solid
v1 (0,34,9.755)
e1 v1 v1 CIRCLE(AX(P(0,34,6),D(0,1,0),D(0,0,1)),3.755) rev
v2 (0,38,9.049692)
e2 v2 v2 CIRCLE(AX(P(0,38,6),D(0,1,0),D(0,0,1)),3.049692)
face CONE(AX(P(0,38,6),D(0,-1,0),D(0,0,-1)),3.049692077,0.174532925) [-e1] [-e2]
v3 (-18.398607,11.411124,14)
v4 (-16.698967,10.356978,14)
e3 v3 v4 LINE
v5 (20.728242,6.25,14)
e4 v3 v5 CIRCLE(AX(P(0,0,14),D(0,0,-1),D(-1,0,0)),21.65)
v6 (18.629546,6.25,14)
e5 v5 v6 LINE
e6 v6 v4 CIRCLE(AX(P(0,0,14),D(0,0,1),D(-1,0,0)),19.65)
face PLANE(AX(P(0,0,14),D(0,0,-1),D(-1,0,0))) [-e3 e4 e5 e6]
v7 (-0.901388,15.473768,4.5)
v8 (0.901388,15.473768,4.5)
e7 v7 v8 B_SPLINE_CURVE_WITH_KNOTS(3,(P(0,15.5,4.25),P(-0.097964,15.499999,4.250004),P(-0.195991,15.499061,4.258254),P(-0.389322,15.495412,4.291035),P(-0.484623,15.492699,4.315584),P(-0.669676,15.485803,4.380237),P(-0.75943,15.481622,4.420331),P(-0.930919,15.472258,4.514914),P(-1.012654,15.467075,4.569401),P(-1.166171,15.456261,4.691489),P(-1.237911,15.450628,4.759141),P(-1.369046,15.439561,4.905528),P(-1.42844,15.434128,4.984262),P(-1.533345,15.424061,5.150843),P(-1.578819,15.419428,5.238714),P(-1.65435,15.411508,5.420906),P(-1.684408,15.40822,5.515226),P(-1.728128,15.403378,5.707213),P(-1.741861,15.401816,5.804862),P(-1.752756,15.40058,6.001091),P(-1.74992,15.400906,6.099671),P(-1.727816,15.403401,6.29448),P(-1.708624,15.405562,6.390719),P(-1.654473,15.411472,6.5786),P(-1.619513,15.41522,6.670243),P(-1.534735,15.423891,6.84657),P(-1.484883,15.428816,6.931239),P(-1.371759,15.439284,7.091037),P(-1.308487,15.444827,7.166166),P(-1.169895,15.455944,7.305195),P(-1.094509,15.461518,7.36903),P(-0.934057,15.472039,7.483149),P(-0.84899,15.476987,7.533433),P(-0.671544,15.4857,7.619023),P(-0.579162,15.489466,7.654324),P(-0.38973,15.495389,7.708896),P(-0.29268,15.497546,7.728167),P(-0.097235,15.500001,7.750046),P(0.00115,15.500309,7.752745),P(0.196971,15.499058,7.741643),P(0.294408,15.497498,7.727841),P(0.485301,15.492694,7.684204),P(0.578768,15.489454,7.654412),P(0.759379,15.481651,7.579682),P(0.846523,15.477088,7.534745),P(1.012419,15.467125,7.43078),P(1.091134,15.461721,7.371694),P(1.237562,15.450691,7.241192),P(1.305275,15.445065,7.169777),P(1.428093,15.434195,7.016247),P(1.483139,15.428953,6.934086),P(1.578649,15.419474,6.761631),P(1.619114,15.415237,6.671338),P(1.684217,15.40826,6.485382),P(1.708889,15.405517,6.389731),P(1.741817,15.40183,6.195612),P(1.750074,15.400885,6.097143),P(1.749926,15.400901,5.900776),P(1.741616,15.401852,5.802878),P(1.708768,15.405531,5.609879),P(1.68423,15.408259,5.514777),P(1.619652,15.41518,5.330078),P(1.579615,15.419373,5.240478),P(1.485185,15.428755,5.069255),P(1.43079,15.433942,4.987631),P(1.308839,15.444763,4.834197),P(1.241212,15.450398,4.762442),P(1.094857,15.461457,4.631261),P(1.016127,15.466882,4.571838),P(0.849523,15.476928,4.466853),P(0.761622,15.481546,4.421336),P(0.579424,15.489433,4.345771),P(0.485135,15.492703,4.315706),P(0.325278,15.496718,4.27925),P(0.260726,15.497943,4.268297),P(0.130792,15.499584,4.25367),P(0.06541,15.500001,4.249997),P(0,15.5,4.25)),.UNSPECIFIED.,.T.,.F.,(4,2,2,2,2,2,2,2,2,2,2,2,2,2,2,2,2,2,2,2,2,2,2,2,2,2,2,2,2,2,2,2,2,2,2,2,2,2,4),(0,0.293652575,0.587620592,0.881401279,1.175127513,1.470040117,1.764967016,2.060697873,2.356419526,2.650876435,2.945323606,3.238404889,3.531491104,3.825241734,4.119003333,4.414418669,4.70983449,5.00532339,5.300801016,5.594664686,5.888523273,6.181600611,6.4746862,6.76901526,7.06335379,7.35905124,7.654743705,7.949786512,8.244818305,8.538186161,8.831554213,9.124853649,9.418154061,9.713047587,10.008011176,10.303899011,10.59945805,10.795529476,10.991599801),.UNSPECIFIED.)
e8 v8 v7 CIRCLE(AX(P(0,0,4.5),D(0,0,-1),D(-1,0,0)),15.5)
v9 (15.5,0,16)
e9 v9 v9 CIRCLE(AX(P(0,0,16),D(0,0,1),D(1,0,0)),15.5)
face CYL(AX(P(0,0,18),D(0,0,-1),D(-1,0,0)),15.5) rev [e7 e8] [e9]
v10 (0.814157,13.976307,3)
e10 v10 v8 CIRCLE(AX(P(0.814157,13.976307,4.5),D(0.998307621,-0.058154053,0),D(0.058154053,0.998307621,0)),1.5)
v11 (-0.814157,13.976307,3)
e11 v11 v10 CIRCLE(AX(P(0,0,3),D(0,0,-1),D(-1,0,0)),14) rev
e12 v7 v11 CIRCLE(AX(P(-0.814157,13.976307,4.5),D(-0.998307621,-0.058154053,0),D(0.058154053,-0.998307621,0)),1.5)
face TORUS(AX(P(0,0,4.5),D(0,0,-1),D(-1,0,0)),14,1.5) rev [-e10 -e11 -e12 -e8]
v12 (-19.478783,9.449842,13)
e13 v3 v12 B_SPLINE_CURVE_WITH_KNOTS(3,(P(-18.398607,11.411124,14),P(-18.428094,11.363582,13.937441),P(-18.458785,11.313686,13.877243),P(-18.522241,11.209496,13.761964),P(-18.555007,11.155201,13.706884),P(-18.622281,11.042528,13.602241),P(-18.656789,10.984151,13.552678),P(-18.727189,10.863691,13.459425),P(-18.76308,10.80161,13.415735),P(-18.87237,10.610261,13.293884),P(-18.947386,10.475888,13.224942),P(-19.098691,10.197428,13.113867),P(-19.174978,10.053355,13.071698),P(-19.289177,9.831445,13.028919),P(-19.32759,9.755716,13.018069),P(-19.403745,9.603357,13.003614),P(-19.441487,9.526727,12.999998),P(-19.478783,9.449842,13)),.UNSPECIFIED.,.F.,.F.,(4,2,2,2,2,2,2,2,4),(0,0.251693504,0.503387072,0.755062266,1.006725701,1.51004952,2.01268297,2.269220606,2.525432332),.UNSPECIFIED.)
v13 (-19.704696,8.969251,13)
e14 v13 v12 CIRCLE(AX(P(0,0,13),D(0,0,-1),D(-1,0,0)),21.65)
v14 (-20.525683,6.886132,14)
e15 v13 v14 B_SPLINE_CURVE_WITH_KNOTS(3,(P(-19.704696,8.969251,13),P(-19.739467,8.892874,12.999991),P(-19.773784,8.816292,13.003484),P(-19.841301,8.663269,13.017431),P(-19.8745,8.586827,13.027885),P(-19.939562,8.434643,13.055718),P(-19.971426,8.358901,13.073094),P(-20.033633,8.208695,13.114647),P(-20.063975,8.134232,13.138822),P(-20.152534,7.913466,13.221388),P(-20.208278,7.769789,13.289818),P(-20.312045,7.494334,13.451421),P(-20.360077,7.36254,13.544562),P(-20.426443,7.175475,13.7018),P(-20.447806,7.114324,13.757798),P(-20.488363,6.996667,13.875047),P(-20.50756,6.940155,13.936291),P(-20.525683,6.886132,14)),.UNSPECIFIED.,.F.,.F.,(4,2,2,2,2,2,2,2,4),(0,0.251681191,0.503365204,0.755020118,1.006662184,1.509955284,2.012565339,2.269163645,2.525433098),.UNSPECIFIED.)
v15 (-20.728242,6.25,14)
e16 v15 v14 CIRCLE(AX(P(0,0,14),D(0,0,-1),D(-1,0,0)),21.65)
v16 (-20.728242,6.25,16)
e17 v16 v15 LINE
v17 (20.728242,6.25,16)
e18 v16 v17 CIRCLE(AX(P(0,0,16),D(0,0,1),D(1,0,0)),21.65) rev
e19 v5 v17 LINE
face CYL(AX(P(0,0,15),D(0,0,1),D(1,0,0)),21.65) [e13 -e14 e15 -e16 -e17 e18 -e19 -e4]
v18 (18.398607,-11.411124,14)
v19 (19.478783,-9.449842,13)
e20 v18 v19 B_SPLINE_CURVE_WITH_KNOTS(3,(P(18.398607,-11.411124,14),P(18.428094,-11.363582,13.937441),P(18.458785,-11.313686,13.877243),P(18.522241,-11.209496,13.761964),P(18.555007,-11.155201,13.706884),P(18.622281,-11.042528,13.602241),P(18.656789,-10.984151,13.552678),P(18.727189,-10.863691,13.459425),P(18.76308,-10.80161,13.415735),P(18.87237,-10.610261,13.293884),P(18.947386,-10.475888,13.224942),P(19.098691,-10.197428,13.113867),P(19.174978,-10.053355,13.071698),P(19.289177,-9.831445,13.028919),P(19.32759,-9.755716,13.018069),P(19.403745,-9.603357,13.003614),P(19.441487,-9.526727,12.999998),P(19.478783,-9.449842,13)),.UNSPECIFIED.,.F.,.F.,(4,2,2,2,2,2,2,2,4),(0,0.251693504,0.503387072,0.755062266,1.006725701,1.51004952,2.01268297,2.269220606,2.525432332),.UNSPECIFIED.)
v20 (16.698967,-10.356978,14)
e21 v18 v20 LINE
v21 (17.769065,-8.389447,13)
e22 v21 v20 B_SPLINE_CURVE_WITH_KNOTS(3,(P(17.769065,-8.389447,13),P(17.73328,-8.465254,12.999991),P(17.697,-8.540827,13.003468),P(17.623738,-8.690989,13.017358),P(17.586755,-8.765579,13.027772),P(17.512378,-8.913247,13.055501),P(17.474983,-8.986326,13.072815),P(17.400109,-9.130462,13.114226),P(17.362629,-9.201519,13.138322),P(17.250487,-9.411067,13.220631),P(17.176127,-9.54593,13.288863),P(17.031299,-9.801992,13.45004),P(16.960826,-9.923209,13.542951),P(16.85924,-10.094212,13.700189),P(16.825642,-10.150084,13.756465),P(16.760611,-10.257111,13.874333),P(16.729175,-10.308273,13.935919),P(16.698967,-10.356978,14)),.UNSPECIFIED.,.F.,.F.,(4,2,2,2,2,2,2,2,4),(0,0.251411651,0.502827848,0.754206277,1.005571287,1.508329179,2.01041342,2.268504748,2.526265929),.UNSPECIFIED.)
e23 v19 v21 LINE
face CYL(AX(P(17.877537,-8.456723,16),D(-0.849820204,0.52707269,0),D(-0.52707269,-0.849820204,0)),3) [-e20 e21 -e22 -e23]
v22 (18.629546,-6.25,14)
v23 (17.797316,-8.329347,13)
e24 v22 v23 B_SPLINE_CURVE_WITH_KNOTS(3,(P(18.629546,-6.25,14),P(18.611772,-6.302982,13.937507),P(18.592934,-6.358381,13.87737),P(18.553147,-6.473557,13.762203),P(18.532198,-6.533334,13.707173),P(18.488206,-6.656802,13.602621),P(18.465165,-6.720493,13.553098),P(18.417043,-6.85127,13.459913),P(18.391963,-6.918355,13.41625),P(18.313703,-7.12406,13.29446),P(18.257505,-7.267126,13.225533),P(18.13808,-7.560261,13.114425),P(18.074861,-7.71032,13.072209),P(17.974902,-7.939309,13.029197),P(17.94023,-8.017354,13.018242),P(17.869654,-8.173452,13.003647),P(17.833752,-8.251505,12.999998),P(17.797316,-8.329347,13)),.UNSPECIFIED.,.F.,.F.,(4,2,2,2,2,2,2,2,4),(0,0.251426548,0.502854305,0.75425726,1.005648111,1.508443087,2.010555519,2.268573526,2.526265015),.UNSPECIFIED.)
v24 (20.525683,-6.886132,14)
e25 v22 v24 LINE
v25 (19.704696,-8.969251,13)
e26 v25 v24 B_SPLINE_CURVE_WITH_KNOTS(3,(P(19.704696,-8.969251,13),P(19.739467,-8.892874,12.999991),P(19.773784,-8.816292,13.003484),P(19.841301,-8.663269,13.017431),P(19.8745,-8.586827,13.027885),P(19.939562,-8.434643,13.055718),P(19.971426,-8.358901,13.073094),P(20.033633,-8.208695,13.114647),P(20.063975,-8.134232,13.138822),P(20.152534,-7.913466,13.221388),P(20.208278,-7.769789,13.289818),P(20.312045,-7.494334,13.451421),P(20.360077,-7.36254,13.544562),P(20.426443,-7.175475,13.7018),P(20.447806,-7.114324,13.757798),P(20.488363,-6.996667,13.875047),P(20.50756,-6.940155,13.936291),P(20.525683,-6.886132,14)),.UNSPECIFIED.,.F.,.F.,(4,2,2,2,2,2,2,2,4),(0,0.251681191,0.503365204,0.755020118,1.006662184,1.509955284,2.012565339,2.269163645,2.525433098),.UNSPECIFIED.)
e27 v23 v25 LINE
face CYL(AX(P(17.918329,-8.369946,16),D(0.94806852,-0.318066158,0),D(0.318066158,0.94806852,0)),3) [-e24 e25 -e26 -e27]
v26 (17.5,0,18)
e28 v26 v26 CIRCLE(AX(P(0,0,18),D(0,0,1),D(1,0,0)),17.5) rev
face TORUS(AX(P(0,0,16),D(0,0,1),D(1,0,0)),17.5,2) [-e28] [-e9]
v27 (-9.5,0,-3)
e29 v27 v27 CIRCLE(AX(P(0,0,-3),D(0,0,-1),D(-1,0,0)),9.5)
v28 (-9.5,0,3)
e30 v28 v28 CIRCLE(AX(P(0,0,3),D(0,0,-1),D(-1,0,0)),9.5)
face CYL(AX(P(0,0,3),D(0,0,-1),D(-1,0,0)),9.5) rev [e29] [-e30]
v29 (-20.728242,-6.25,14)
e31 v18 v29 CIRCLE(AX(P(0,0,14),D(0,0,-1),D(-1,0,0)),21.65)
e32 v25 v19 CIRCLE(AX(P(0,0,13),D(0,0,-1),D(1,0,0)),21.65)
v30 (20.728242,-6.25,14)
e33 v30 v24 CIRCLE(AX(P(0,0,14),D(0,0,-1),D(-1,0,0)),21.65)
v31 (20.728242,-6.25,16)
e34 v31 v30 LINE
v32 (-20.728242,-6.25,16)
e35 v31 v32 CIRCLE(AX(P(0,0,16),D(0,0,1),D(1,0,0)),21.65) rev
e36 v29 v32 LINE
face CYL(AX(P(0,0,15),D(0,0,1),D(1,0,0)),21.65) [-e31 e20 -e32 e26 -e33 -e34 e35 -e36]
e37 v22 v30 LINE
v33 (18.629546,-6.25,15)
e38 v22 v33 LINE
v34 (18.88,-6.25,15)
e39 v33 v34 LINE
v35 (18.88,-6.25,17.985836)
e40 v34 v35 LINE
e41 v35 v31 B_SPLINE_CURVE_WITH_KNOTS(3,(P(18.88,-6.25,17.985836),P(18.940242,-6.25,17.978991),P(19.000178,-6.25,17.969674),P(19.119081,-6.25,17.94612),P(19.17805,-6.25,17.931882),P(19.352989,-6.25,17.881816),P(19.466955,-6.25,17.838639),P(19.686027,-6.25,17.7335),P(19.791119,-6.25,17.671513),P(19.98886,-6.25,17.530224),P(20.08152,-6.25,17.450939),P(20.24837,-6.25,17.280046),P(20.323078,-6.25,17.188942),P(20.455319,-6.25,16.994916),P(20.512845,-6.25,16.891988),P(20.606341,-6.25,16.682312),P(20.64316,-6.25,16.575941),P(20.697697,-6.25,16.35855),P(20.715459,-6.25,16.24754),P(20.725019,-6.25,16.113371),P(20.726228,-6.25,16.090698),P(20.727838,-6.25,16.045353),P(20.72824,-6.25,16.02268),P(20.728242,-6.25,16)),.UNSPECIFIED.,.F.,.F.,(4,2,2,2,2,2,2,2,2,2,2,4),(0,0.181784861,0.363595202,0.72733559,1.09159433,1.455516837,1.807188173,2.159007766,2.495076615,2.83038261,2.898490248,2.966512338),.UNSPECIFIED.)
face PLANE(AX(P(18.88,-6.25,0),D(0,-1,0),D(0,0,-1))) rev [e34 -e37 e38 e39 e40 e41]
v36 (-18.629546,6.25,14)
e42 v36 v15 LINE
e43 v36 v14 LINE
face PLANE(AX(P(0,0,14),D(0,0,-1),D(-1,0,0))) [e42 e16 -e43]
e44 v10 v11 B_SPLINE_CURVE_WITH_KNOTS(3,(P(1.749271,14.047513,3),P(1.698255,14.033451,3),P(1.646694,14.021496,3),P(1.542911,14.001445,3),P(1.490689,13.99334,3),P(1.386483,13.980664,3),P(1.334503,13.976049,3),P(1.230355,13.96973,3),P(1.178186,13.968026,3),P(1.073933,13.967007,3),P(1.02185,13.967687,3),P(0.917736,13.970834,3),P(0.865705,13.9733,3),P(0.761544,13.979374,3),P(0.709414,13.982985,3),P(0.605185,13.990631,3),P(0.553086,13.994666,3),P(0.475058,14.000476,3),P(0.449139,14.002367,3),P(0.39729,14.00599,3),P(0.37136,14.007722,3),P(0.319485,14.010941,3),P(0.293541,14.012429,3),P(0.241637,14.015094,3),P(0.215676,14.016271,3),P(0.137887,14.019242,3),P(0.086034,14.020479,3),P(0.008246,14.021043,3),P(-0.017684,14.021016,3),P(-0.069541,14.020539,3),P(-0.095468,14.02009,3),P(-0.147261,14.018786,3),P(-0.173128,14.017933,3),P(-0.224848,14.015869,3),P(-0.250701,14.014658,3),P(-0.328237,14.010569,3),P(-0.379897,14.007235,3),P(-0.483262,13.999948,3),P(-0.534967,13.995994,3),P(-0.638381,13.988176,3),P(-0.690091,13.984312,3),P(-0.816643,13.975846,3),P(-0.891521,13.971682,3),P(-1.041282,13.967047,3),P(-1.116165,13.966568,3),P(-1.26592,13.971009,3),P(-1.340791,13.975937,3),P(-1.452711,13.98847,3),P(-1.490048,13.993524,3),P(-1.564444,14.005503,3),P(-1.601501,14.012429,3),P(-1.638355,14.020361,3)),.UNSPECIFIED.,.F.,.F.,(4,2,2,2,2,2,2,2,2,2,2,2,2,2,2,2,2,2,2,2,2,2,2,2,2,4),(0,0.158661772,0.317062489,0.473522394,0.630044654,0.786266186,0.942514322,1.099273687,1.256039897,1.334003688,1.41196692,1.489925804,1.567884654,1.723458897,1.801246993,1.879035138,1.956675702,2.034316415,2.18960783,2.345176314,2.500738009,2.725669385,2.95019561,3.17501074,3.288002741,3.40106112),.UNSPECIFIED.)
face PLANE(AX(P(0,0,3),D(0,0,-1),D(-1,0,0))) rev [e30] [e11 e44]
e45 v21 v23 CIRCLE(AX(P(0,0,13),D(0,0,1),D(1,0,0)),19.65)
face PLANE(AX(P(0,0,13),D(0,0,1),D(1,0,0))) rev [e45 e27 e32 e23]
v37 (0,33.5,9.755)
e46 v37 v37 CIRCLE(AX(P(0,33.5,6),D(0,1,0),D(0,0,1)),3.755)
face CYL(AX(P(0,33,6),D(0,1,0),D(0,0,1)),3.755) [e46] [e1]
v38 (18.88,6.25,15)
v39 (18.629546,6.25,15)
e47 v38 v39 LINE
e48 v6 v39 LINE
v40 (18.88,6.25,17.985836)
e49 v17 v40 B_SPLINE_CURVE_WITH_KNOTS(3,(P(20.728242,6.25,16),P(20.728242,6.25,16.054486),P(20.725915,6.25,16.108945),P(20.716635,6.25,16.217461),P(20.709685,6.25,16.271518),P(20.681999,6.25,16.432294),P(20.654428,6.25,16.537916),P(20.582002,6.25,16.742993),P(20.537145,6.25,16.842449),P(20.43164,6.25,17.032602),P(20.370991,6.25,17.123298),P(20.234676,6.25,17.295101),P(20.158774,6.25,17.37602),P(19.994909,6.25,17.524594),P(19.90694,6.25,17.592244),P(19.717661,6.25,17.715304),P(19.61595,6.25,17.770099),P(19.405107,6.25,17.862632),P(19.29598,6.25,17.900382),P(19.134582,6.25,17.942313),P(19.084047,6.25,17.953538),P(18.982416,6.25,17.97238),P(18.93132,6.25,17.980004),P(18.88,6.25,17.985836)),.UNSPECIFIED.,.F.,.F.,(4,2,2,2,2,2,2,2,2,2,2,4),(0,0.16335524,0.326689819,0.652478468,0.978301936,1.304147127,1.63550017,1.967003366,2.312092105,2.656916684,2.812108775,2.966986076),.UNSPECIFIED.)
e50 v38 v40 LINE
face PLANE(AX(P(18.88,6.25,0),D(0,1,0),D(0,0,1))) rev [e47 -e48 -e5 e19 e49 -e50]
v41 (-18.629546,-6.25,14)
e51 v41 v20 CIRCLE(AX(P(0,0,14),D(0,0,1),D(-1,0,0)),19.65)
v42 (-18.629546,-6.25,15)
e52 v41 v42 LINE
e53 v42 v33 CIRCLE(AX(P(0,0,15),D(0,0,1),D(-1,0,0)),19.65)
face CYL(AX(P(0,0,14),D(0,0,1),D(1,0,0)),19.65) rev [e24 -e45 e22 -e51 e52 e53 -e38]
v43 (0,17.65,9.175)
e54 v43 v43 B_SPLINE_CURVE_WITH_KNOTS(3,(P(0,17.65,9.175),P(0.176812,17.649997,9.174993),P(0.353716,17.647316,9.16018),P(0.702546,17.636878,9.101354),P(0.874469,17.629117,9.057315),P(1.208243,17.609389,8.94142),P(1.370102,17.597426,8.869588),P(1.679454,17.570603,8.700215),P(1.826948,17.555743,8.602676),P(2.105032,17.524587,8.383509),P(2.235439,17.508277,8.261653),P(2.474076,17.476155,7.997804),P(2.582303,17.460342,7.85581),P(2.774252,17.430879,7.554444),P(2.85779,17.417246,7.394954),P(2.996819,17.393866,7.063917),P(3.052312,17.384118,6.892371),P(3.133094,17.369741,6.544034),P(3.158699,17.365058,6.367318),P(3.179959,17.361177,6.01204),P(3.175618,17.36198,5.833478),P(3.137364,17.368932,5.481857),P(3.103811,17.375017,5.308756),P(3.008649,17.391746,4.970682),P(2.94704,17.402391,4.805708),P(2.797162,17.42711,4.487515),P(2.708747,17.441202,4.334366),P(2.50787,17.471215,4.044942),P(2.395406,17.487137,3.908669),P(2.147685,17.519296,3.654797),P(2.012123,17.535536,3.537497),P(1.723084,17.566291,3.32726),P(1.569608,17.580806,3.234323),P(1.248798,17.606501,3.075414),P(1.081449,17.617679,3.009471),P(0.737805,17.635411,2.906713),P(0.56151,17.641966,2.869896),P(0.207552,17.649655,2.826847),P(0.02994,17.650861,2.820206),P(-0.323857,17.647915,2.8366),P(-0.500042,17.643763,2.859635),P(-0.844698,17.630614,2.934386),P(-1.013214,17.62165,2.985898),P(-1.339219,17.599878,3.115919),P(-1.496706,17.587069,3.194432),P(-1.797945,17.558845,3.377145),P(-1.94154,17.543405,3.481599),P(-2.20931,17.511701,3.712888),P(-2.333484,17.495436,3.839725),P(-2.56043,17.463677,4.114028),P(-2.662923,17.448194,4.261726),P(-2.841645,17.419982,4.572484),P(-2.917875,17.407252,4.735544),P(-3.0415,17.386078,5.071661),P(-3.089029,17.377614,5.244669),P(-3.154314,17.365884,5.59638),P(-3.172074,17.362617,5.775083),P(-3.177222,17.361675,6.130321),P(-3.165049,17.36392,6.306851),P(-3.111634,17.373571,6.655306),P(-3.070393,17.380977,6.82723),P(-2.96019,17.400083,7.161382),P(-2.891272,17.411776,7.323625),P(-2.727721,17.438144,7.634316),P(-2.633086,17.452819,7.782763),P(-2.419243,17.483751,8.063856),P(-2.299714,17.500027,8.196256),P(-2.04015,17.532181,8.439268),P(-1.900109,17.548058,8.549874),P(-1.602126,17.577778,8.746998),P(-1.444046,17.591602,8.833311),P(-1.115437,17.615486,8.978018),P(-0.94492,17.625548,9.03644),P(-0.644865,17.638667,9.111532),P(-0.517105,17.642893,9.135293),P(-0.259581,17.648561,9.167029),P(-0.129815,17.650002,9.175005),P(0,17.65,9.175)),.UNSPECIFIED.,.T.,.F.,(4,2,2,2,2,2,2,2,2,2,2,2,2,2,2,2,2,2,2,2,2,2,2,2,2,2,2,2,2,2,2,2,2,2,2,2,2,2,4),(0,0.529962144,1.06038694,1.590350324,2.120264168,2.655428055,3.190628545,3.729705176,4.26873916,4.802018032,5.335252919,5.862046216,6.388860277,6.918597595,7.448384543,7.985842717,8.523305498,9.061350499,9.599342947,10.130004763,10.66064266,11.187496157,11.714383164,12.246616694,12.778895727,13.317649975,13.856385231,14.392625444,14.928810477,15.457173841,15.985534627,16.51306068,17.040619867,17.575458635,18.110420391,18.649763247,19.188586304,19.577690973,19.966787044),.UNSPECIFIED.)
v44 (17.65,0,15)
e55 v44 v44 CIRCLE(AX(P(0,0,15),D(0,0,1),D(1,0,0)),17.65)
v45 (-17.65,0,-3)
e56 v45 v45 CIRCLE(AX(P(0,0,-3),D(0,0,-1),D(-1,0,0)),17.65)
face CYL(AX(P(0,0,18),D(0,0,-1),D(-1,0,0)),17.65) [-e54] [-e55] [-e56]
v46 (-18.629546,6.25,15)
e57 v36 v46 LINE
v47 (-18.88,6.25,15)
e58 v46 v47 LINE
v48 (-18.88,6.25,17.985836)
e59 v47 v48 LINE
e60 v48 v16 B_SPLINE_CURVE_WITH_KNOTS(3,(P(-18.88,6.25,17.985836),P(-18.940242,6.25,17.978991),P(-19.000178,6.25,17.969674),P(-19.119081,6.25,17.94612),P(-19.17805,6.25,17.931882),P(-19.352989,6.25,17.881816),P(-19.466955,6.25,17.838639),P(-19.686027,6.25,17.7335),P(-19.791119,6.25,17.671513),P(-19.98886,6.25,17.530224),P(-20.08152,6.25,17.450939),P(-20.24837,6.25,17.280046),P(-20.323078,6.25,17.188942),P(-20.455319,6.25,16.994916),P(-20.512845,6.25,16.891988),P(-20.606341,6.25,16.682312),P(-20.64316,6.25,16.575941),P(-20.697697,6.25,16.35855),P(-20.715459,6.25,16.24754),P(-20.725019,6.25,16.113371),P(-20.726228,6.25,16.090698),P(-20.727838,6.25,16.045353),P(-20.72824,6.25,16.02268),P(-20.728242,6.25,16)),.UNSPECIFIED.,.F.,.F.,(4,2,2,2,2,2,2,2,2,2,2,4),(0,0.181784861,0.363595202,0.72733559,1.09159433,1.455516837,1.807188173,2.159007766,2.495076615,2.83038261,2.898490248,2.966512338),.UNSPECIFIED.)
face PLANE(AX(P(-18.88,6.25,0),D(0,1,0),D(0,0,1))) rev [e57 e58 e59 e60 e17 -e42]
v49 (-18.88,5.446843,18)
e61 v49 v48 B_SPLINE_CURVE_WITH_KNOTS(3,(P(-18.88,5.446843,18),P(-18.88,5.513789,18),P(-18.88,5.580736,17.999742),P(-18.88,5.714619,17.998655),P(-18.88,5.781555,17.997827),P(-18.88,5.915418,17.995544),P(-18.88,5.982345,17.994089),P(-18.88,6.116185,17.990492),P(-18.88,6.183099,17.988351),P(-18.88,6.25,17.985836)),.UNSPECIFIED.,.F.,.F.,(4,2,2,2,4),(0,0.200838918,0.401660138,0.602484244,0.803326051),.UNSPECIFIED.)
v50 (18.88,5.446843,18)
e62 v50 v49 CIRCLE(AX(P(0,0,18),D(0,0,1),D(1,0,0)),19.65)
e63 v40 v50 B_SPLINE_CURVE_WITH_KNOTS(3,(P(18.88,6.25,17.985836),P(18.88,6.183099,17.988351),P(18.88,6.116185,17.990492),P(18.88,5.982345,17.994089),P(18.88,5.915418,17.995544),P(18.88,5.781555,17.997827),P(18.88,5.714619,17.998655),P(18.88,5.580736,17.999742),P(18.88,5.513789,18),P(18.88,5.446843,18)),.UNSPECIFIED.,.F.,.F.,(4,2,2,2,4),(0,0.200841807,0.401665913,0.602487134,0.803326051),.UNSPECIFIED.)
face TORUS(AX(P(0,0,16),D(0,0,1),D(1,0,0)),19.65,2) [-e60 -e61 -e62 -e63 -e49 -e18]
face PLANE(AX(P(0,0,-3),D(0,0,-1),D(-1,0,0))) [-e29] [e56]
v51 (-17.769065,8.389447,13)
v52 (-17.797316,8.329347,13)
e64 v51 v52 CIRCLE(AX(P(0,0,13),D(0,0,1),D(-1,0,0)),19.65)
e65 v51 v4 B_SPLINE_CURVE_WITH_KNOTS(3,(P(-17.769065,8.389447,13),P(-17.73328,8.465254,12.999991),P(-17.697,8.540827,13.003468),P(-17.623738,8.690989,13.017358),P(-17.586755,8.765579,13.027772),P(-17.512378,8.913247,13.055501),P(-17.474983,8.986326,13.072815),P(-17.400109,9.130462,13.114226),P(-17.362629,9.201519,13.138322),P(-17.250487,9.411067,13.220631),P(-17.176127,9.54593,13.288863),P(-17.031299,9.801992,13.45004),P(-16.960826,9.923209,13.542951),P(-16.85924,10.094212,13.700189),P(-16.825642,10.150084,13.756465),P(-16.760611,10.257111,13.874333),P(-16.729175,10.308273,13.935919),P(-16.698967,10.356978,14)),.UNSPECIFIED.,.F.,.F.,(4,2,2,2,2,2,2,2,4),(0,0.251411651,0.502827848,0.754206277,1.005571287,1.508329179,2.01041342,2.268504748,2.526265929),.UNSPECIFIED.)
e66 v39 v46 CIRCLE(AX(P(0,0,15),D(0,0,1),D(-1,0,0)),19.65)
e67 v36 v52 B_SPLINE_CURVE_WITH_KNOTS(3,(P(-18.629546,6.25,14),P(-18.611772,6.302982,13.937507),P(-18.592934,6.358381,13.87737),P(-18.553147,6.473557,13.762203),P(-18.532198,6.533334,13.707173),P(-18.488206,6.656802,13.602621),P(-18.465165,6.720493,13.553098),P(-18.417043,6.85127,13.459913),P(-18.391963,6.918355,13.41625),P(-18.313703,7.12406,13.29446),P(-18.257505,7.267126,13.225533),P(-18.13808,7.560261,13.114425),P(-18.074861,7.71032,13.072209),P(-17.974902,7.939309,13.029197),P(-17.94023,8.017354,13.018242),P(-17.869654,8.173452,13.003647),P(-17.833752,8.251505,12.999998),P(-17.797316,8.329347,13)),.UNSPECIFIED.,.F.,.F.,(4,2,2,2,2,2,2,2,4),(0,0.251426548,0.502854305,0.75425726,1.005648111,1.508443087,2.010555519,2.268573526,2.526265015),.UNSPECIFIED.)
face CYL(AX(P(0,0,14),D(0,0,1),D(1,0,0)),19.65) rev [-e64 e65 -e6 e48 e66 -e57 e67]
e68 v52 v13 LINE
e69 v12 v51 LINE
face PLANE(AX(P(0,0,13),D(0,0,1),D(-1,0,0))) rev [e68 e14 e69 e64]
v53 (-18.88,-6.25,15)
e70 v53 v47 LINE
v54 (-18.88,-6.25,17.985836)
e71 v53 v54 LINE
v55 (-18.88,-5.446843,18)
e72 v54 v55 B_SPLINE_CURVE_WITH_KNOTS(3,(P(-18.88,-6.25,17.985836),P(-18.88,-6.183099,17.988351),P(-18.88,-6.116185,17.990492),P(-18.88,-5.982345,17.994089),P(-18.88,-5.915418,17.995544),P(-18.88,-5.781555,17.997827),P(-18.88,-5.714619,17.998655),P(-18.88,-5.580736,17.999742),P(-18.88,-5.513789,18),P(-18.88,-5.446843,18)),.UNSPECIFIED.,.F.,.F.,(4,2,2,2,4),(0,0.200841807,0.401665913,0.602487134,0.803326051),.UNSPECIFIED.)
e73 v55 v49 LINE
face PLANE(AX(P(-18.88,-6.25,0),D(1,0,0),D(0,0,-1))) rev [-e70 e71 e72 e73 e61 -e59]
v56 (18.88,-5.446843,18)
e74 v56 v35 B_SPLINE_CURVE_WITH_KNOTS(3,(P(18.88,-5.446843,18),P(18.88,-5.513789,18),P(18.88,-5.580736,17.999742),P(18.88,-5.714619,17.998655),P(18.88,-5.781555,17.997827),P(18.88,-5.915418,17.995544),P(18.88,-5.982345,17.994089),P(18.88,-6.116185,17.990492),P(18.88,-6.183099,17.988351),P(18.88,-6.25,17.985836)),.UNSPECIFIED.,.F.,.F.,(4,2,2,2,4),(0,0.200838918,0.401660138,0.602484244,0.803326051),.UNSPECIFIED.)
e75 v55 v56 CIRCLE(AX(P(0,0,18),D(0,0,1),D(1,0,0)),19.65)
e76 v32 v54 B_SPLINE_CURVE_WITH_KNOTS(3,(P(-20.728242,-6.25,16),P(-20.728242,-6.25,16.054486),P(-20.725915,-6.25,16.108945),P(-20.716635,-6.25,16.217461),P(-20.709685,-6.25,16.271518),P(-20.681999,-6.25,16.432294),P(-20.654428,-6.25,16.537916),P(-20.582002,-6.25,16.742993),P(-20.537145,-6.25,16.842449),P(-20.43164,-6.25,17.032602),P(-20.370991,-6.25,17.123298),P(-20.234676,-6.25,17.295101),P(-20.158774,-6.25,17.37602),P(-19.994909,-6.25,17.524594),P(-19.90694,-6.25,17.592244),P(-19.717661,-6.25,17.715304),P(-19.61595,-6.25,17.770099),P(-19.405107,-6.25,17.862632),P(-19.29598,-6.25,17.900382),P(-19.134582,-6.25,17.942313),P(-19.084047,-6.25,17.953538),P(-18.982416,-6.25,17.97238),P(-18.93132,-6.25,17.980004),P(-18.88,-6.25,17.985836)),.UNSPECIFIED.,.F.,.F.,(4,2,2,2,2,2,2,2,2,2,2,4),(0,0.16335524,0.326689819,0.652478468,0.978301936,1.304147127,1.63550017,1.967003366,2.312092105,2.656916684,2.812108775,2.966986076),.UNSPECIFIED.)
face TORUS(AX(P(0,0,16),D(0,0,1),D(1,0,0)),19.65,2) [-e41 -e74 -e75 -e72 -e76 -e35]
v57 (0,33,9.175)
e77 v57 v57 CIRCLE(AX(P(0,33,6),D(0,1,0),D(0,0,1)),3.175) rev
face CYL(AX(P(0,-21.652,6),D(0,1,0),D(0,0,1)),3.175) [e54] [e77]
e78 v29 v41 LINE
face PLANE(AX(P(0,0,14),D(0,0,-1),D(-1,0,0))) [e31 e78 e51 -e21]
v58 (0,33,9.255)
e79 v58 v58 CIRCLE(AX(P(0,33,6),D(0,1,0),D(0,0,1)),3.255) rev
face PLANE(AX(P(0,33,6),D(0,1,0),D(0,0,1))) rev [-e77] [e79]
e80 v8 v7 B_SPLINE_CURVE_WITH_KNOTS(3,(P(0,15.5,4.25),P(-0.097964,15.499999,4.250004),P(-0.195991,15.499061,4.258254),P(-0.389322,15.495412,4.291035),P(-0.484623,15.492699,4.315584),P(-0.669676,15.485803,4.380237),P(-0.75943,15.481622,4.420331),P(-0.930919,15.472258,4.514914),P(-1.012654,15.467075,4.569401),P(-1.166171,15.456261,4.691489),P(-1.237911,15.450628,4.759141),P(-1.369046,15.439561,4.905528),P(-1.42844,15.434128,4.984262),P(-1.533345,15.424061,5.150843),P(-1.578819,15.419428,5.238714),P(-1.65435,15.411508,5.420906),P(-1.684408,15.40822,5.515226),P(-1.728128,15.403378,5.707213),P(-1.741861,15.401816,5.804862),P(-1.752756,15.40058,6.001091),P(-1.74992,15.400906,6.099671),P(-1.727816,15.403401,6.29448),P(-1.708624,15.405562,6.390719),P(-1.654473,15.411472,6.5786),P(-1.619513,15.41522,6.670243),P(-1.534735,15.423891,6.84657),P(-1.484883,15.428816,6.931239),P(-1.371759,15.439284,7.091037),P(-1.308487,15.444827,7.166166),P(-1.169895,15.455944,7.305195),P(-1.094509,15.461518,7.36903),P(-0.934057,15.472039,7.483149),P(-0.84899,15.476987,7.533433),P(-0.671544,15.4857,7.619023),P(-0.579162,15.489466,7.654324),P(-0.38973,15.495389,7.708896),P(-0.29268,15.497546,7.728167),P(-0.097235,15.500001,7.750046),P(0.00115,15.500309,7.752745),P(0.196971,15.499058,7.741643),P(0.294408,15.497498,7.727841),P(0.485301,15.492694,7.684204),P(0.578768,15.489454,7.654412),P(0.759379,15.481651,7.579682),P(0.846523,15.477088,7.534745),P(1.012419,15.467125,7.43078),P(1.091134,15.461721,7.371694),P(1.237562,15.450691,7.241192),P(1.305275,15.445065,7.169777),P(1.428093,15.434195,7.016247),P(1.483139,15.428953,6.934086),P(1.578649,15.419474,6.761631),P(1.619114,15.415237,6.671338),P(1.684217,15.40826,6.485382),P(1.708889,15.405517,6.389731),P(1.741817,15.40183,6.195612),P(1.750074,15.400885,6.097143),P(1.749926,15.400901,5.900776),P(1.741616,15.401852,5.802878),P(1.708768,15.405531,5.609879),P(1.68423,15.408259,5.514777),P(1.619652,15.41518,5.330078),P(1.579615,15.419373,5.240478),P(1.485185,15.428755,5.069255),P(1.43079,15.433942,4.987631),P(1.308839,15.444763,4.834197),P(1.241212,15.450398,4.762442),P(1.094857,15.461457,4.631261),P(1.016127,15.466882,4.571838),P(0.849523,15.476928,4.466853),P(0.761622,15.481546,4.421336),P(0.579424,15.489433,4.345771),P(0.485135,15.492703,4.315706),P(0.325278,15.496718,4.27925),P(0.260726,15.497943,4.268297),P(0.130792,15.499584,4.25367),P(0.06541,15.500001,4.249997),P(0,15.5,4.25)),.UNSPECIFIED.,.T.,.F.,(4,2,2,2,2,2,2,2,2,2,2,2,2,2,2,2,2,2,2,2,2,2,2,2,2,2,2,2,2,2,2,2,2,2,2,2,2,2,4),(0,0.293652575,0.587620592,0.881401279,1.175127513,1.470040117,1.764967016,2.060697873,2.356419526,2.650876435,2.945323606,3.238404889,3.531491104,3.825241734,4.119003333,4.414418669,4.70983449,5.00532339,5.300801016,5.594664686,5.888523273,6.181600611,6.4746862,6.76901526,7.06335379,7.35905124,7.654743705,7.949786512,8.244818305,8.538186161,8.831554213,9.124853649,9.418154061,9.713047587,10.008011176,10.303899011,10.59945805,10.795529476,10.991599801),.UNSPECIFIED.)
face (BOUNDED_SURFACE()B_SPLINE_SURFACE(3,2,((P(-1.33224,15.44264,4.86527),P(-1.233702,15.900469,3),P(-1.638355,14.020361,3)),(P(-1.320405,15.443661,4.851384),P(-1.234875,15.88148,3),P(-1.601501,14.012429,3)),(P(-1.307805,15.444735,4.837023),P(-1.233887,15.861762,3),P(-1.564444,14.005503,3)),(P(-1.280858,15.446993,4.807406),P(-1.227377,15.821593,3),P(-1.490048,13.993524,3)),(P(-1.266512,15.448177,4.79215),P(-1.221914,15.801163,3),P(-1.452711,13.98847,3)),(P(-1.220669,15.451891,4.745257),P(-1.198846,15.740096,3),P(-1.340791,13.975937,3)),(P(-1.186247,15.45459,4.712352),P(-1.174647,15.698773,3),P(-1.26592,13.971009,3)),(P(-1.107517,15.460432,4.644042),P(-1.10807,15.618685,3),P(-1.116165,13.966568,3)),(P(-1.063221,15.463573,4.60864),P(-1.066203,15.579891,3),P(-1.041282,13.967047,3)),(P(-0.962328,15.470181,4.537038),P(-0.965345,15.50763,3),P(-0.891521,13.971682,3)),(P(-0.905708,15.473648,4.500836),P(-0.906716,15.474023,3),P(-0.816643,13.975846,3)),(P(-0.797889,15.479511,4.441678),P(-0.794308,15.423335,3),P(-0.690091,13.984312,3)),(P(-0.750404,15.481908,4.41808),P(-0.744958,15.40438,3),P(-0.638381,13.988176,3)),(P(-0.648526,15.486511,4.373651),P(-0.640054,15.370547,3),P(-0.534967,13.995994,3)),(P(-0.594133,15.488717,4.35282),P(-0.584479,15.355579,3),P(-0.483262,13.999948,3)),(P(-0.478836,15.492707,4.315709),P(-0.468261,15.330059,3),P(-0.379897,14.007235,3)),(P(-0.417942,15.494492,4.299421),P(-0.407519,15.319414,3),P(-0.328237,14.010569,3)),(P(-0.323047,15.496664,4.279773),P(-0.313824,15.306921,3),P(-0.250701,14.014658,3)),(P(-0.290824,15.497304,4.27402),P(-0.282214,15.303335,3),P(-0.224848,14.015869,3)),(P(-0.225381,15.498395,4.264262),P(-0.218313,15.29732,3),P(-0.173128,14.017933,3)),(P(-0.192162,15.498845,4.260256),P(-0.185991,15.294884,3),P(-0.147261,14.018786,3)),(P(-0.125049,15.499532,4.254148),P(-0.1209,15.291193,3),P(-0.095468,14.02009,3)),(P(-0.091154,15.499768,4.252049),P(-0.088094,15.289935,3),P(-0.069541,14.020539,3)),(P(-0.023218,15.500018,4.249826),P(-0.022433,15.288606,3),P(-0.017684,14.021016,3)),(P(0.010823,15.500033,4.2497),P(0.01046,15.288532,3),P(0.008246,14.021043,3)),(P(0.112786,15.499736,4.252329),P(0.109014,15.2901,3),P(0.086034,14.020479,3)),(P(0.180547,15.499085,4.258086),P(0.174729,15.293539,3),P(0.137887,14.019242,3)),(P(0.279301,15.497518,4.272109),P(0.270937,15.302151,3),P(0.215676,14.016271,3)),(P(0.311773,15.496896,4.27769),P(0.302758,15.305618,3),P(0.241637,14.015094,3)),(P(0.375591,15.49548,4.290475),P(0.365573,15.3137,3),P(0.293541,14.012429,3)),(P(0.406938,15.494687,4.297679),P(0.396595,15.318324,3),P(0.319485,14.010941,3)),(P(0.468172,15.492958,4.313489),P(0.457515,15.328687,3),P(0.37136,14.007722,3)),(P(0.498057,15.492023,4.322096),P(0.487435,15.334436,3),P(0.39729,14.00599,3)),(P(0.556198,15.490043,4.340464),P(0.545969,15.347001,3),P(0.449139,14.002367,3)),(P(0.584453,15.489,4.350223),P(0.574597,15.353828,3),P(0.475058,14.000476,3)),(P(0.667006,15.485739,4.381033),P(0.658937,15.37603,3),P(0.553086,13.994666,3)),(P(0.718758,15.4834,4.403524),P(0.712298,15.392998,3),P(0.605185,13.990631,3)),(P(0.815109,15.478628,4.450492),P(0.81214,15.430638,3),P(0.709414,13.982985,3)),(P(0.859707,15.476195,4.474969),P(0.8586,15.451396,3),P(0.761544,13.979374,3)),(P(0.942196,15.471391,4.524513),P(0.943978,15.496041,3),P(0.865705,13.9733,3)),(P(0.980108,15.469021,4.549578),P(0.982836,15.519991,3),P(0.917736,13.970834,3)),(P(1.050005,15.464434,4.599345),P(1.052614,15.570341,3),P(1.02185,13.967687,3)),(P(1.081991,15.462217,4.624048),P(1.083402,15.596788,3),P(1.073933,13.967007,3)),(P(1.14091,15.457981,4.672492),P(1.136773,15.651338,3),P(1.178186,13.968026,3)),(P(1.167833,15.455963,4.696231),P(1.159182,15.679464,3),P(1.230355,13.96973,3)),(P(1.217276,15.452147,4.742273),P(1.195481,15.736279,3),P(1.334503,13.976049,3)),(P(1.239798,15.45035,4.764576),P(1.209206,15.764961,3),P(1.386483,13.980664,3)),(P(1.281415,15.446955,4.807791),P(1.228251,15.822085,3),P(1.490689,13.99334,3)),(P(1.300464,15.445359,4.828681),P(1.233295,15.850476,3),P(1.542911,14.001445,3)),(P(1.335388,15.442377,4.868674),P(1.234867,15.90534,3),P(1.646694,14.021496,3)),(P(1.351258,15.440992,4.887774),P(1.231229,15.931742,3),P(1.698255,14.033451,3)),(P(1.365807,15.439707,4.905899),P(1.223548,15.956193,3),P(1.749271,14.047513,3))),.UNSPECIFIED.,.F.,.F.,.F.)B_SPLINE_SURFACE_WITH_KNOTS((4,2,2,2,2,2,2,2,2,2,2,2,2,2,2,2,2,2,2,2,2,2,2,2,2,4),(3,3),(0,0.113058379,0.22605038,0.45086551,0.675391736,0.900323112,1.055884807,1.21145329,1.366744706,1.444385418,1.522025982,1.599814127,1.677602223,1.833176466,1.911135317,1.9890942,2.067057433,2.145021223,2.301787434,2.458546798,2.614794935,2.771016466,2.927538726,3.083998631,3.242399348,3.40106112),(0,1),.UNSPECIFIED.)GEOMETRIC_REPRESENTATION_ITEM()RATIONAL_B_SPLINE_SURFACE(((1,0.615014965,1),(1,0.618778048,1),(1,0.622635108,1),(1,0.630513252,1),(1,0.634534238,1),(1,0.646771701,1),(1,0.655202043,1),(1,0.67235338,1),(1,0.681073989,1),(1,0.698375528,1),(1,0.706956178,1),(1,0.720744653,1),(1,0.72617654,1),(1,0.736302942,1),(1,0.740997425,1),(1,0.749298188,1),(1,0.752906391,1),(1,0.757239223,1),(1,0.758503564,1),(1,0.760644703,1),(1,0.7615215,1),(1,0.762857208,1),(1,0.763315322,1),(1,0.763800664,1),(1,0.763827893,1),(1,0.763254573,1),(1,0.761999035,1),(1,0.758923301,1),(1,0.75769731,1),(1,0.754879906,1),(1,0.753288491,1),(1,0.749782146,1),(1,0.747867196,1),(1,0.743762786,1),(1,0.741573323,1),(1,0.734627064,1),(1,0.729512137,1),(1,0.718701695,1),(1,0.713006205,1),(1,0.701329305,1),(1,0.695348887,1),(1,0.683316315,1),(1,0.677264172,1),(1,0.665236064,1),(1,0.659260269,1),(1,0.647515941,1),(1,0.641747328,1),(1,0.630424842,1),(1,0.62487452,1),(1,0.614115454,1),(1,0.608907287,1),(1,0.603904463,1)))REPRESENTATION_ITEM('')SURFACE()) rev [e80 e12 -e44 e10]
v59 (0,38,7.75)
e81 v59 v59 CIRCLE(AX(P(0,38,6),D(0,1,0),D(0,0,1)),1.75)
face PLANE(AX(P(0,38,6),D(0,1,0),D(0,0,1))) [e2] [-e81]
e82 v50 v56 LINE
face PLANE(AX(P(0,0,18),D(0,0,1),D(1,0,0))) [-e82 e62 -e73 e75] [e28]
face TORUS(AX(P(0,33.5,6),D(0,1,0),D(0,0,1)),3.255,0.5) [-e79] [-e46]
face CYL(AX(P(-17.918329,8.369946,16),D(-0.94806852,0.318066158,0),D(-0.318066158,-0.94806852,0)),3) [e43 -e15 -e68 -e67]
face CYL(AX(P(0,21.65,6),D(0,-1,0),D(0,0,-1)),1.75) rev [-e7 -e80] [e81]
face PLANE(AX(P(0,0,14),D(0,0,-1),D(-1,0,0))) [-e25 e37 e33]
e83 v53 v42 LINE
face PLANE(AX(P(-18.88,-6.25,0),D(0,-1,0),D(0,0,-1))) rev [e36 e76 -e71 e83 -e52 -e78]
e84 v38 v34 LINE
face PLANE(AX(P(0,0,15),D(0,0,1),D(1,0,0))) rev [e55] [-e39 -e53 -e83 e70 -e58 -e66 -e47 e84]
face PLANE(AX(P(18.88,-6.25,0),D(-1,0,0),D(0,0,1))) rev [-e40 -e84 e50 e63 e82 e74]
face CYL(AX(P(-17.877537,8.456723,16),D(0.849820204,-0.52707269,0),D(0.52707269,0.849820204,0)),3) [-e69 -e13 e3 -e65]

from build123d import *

# Parameters (mm, degrees)
SKETCH1_R                = 17.65
SKETCH1_R_2              = 15.5
BOSS_EXTRUDE1_DEPTH      = 18
BOSS_EXTRUDE2_START      = -3
SKETCH2_R                = 21.65
SKETCH2_R_2              = 15.5
BOSS_EXTRUDE2_DEPTH      = 3
SKETCH3_W                = 5
SKETCH3_H                = 12.5
CUT_EXTRUDE1_DEPTH       = 36.516826998
BOSS_EXTRUDE3_START      = 1
BOSS_EXTRUDE3_DEPTH      = 1
BOSS_EXTRUDE4_START      = 1
BOSS_EXTRUDE4_DEPTH      = 1
CIRPATTERN1_COUNT        = 2
FILLET1_R                = 3
FILLET2_R                = 2
SKETCH6_R                = 1.75
CUT_EXTRUDE2_DEPTH       = 35.96258732
BOSS_EXTRUDE5_REACH      = 74.963
BOSS_EXTRUDE5_END_RADIUS = 17.65
BOSS_EXTRUDE5_START      = 38
SKETCH6_4_R              = 3.175
SKETCH6_4_R_2            = 1.75
SKETCH7_R                = 3.755
SKETCH7_R_2              = 1.75
BOSS_EXTRUDE6_DEPTH      = 5
CHAMFER1_SIZE            = 4
CHAMFER1_SIZE2           = 0.705307923
BOSS_EXTRUDE7_DEPTH      = 3
BOSS_EXTRUDE7_DEPTH_BACK = 3
SKETCH8_R                = 17.65
SKETCH8_R_2              = 9.5
FILLET4_R                = 1.5
FILLET5_R                = 0.5


with BuildPart() as part:
    # Sketch1 → Boss-Extrude1 (new body)
    with BuildSketch(Plane.XY):
        Circle(SKETCH1_R)
        Circle(SKETCH1_R_2, mode=Mode.SUBTRACT)
    extrude(amount=BOSS_EXTRUDE1_DEPTH)

    # Sketch2 → Boss-Extrude2 (add)
    with BuildSketch(Plane.XY.offset(18).offset(BOSS_EXTRUDE2_START)):
        Circle(SKETCH2_R)
        Circle(SKETCH2_R_2, mode=Mode.SUBTRACT)
    extrude(amount=BOSS_EXTRUDE2_DEPTH)

    # Sketch3 → Cut-Extrude1 (cut, through all)
    with BuildSketch(Plane.XY.offset(18)):
        with Locations((21.38, 0)):
            Rectangle(SKETCH3_W, SKETCH3_H)
        with Locations((-21.38, 0)):
            Rectangle(SKETCH3_W, SKETCH3_H)
    extrude(amount=-CUT_EXTRUDE1_DEPTH, mode=Mode.SUBTRACT)

    # Sketch4 → Boss-Extrude3 (add)
    with BuildSketch(Plane(origin=(0, 0, 15), x_dir=(-1, 0, 0), z_dir=(0, 0, -1)).offset(BOSS_EXTRUDE3_START)):
        with BuildLine():
            Line((-20.728241604, -6.25), (-18.629546425, -6.25))
            ThreePointArc((-18.629546425, -6.25), (0, -19.65), (18.629546425, -6.25))
            Line((18.629546425, -6.25), (20.728241604, -6.25))
            ThreePointArc((20.728241604, -6.25), (0, -21.65), (-20.728241604, -6.25))
        make_face()
        with BuildLine():
            Line((-20.728241604, 6.25), (-18.629546425, 6.25))
            ThreePointArc((-18.629546425, 6.25), (0, 19.65), (18.629546425, 6.25))
            Line((18.629546425, 6.25), (20.728241604, 6.25))
            ThreePointArc((20.728241604, 6.25), (0, 21.65), (-20.728241604, 6.25))
        make_face()
    extrude(amount=-BOSS_EXTRUDE3_DEPTH)

    # Sketch5 → Boss-Extrude4 (add)
    with BuildSketch(Plane(origin=(0, 0, 14), x_dir=(-1, 0, 0), z_dir=(0, 0, -1)).offset(BOSS_EXTRUDE4_START)):
        with BuildLine():
            Line((-18.629546425, -6.25), (-20.525683466, -6.886132316))
            ThreePointArc((-20.525683466, -6.886132316), (-19.593212906, -9.210239302), (-18.398607414, -11.411123749))
            Line((-18.398607414, -11.411123749), (-16.698967007, -10.356978368))
            ThreePointArc((-16.698967007, -10.356978368), (-17.783216333, -8.359408882), (-18.629546425, -6.25))
        make_face()
    boss_extrude4 = extrude(amount=-BOSS_EXTRUDE4_DEPTH)

    # CirPattern1: Boss-Extrude4 ×2 about axis
    cirpattern1_axis = Axis((0, 0, 0), (0, 0, 1))
    for i in range(1, CIRPATTERN1_COUNT):
        add(boss_extrude4.rotate(cirpattern1_axis, i * 360 / CIRPATTERN1_COUNT))

    # Fillet1
    # the kernel refuses this fillet: 3 mm, written as the material it takes off along each edge
    with BuildSketch(Plane(origin=(-23.149246776, 14.357549661, 13), x_dir=(0, 0, 1), z_dir=(0.8498202038966606, -0.527072690479253, 0))) as fillet1_piece_1_section:
        with BuildLine():
            CenterArc((3, 2.236067977), FILLET1_R, 180, 48.189685104)
            Line((0, 2.236067977), (0, 0))
            Line((0, 0), (1, 0))
        make_face()
    fillet1_piece_1 = extrude(amount=13.180339887, mode=Mode.PRIVATE)
    fillet1_piece_1 = fillet1_piece_1 - Plane(origin=(0, 0, 13.255909987), x_dir=(0.9480685203545537, 0.3180661577608143, 0), z_dir=(0, 0, -1)) * Cylinder(19.65, 36, mode=Mode.PRIVATE)
    add(fillet1_piece_1, mode=Mode.SUBTRACT)
    with BuildSketch(Plane(origin=(-13.329682278, 4.471956125, 13), x_dir=(0, 0, 1), z_dir=(-0.9480685203545541, 0.3180661577608135, 0))) as fillet1_piece_2_section:
        with BuildLine():
            CenterArc((3, 2.236067977), FILLET1_R, 180, 48.189685104)
            Line((0, 2.236067977), (0, 0))
            Line((0, 0), (1, 0))
        make_face()
    fillet1_piece_2 = extrude(amount=13.180339887, mode=Mode.PRIVATE)
    fillet1_piece_2 = fillet1_piece_2 - Plane(origin=(0, 0, 13.255909987), x_dir=(0.9480685203545537, 0.3180661577608143, 0), z_dir=(0, 0, -1)) * Cylinder(19.65, 36, mode=Mode.PRIVATE)
    add(fillet1_piece_2, mode=Mode.SUBTRACT)
    with BuildSketch(Plane(origin=(23.149246776, -14.357549661, 13), x_dir=(0, 0, 1), z_dir=(-0.8498202038966607, 0.5270726904792529, 0))) as fillet1_piece_3_section:
        with BuildLine():
            CenterArc((3, 2.236067977), FILLET1_R, 180, 48.189685104)
            Line((0, 2.236067977), (0, 0))
            Line((0, 0), (1, 0))
        make_face()
    fillet1_piece_3 = extrude(amount=13.180339887, mode=Mode.PRIVATE)
    fillet1_piece_3 = fillet1_piece_3 - Plane(origin=(0, 0, 13.255909987), x_dir=(0.9480685203545538, -0.3180661577608143, 0), z_dir=(0, 0, -1)) * Cylinder(19.65, 36, mode=Mode.PRIVATE)
    add(fillet1_piece_3, mode=Mode.SUBTRACT)
    with BuildSketch(Plane(origin=(13.329682278, -4.471956125, 13), x_dir=(-0.3180661577608133, -0.9480685203545539, 0), z_dir=(0.9480685203545541, -0.3180661577608134, 0))) as fillet1_piece_4_section:
        with BuildLine():
            CenterArc((2.236067977, -3), FILLET1_R, 90, 48.189685104)
            Line((0, -1), (0, 0))
            Line((0, 0), (2.236067977, 0))
        make_face()
    fillet1_piece_4 = extrude(amount=13.180339887, mode=Mode.PRIVATE)
    fillet1_piece_4 = fillet1_piece_4 - Plane(origin=(0, 0, 13.255909987), x_dir=(0.9480685203545538, -0.3180661577608143, 0), z_dir=(0, 0, -1)) * Cylinder(19.65, 36, mode=Mode.PRIVATE)
    add(fillet1_piece_4, mode=Mode.SUBTRACT)

    # Fillet2
    fillet2_edges = [part.edges().sort_by_distance(p)[0] for p in [
        (0, 21.65, 18),
        (-15.5, 0, 18),
        (0, -21.65, 18),
    ]]
    fillet(fillet2_edges, radius=FILLET2_R)

    # Sketch6 → Cut-Extrude2 (cut, through all)
    with BuildSketch(Plane(origin=(0, 0, 0), x_dir=(1, 0, 0), z_dir=(0, 1, 0))):
        with Locations(Location((0, -6, 0), (0, 0, 90))):
            Circle(SKETCH6_R)
    extrude(amount=CUT_EXTRUDE2_DEPTH, mode=Mode.SUBTRACT)

    # Boss-Extrude5: up to this cylinder (the profile starts outside it)
    boss_extrude5_end = Plane(origin=(0, 0, 2.914803), z_dir=(0, 0, -1)) * Cylinder(BOSS_EXTRUDE5_END_RADIUS, 186.226, mode=Mode.PRIVATE)
    # Sketch6<4> → Boss-Extrude5 (add, up to the surface)
    with BuildSketch(Plane(origin=(0, 0, 0), x_dir=(1, 0, 0), z_dir=(0, 1, 0)).offset(BOSS_EXTRUDE5_START), mode=Mode.PRIVATE) as boss_extrude5_sk1:
        with Locations(Location((0, -6, 0), (0, 0, 270))):
            Circle(SKETCH6_4_R)
        with Locations(Location((0, -6, 0), (0, 0, 90))):
            Circle(SKETCH6_4_R_2, mode=Mode.SUBTRACT)
    boss_extrude5_tool1 = extrude(boss_extrude5_sk1.sketch, amount=-BOSS_EXTRUDE5_REACH, mode=Mode.PRIVATE) - boss_extrude5_end
    add(boss_extrude5_tool1.solids().sort_by_distance((0, 38, 2.914803))[0])

    # Sketch7 → Boss-Extrude6 (add)
    with BuildSketch(Plane(origin=(0, 38, 0), x_dir=(1, 0, 0), z_dir=(0, 1, 0))):
        with Locations(Location((0, -6, 0), (0, 0, 270))):
            Circle(SKETCH7_R)
        with Locations(Location((0, -6, 0), (0, 0, 90))):
            Circle(SKETCH7_R_2, mode=Mode.SUBTRACT)
    extrude(amount=-BOSS_EXTRUDE6_DEPTH)

    # Chamfer1
    chamfer1_edges = [part.edges().sort_by_distance(p)[0] for p in [
        (0, 38, 2.245),
    ]]
    chamfer1_side = [part.faces().sort_by_distance(p)[0] for p in [
        (0, 35.5, 2.245),
    ]]
    chamfer(chamfer1_edges, length=CHAMFER1_SIZE, length2=CHAMFER1_SIZE2, reference=chamfer1_side[0])

    # Sketch8 → Boss-Extrude7 (add, two sides: drawn at the far end of the back side and taken through both)
    with BuildSketch(Plane(origin=(0, 0, 0), x_dir=(-1, 0, 0), z_dir=(0, 0, -1)).offset(-BOSS_EXTRUDE7_DEPTH_BACK)):
        Circle(SKETCH8_R)
        Circle(SKETCH8_R_2, mode=Mode.SUBTRACT)
    extrude(amount=BOSS_EXTRUDE7_DEPTH + BOSS_EXTRUDE7_DEPTH_BACK)

    # Fillet4
    fillet4_edges = [part.edges().sort_by_distance(p)[0] for p in [
        (-15.5, 0, 3),
    ]]
    fillet(fillet4_edges, radius=FILLET4_R)

    # Fillet5
    fillet5_edges = [part.edges().sort_by_distance(p)[0] for p in [
        (0, 33, 2.245),
    ]]
    fillet(fillet5_edges, radius=FILLET5_R)


solid = part.part
